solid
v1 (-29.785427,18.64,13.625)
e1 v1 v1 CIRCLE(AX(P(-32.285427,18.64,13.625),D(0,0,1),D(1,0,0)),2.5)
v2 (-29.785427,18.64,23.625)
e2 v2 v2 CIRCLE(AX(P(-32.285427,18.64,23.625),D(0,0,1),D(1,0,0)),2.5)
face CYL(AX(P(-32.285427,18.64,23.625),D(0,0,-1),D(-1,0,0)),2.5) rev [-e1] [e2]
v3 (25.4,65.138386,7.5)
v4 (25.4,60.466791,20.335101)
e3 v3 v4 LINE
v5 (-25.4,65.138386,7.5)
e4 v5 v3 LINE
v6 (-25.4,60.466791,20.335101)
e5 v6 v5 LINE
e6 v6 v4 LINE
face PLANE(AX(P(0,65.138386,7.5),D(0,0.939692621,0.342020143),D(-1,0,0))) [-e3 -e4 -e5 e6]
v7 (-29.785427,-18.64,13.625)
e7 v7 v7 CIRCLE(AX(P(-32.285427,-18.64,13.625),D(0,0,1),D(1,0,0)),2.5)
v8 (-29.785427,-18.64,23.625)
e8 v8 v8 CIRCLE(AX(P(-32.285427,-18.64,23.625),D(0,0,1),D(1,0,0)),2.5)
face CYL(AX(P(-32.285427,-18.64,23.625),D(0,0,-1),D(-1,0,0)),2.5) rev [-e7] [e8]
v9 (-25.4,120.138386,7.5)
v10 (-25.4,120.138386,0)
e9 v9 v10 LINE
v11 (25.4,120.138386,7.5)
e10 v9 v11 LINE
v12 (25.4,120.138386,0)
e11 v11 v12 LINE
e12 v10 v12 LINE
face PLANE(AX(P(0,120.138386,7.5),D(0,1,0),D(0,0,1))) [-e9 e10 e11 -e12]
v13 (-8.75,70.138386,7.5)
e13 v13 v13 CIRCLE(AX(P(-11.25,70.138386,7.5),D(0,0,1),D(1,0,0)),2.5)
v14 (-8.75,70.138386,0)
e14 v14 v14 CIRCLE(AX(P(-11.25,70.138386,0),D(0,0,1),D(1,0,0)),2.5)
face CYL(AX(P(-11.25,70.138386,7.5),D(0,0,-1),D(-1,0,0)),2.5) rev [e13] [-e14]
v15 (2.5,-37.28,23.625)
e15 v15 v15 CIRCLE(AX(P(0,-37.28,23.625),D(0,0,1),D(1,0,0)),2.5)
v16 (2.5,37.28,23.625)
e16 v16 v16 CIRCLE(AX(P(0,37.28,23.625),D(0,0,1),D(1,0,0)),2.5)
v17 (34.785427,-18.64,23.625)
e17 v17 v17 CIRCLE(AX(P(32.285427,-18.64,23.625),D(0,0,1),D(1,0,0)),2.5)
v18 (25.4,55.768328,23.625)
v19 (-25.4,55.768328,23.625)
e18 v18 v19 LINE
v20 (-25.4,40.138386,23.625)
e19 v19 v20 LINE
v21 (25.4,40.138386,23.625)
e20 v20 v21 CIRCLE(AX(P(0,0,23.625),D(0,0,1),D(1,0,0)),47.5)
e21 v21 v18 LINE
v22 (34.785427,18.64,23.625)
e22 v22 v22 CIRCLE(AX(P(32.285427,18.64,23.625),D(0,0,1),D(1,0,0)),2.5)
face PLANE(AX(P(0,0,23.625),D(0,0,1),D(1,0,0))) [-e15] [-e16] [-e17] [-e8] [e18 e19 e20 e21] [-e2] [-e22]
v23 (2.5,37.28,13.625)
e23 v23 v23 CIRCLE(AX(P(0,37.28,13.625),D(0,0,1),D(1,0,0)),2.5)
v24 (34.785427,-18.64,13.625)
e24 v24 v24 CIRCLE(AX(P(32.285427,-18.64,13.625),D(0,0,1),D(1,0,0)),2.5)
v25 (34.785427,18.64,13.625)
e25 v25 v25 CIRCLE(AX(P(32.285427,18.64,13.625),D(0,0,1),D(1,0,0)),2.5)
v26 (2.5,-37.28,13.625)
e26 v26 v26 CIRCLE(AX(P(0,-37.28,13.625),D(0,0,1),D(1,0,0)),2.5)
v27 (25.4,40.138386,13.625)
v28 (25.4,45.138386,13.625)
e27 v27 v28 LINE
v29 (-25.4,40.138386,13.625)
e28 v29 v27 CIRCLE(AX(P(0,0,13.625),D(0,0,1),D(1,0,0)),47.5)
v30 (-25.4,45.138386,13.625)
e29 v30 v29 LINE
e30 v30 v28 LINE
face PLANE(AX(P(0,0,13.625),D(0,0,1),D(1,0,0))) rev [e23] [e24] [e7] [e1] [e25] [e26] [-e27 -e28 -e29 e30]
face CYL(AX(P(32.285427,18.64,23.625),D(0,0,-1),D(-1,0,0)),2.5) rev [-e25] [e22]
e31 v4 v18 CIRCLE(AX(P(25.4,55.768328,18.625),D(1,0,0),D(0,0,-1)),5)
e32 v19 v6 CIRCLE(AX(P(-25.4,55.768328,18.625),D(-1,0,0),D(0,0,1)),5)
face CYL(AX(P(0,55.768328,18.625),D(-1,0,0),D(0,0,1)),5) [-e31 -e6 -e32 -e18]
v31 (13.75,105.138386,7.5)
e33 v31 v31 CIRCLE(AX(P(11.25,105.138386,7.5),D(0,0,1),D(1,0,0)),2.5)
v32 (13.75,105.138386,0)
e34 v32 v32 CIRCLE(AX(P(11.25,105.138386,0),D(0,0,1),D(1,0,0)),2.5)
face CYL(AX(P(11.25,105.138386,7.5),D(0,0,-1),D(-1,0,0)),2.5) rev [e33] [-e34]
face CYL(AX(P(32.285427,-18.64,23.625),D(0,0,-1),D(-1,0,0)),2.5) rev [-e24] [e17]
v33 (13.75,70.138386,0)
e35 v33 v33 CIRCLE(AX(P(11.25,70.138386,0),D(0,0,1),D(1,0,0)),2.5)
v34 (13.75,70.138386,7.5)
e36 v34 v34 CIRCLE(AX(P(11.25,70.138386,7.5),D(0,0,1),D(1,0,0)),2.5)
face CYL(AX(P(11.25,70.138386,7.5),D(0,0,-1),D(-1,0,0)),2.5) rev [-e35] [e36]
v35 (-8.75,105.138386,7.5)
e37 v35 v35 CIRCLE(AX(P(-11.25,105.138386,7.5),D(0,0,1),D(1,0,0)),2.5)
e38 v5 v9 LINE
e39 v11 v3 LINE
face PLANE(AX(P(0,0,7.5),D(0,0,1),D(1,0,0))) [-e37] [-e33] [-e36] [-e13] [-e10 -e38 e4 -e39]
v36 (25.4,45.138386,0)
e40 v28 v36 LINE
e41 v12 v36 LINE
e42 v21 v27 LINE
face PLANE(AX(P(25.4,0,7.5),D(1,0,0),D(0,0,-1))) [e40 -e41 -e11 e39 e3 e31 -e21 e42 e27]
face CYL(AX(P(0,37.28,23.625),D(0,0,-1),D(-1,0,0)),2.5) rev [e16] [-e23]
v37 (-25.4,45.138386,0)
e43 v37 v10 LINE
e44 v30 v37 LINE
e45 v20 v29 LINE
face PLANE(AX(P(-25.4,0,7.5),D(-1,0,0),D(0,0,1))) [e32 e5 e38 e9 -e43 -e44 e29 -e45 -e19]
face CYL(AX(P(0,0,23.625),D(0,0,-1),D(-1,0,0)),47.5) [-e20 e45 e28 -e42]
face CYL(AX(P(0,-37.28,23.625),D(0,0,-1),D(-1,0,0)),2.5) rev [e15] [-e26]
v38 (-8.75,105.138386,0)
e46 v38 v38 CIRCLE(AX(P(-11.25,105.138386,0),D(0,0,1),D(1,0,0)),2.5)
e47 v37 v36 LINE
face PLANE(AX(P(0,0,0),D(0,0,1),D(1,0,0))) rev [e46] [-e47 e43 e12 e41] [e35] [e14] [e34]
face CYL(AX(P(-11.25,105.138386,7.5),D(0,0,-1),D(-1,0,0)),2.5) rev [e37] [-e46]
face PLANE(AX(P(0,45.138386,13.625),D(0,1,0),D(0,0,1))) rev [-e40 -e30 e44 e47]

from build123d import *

# Parameters (mm, degrees)
SKETCH1_W           = 50.8
SKETCH1_H           = 65.000000038
SKETCH1_R           = 2.5
EXTRUDE_5_DEPTH     = 7.5
SKETCH1_3_W         = 50.8
SKETCH1_3_H         = 10
BOSS_EXTRUDE1_DEPTH = 13.625
BOSS_EXTRUDE2_START = 13.625
SKETCH1_4_R         = 2.5
SKETCH1_4_W         = 50.8
SKETCH1_4_H         = 10
BOSS_EXTRUDE2_DEPTH = 10
CHAMFER1_SIZE       = 10
CHAMFER1_SIZE_2     = 27.474774195
FILLET1_R           = 5


with BuildPart() as part:
    # Sketch1 → 5 (new body)
    with BuildSketch(Plane.XY):
        with Locations((0, 87.638385637)):
            Rectangle(SKETCH1_W, SKETCH1_H)
        with Locations((-11.25, 70.138385656)):
            Circle(SKETCH1_R, mode=Mode.SUBTRACT)
        with Locations((-11.25, 105.138385656)):
            Circle(SKETCH1_R, mode=Mode.SUBTRACT)
        with Locations((11.25, 70.138385656)):
            Circle(SKETCH1_R, mode=Mode.SUBTRACT)
        with Locations((11.25, 105.138385656)):
            Circle(SKETCH1_R, mode=Mode.SUBTRACT)
    extrude(amount=EXTRUDE_5_DEPTH)

    # Sketch1<3> → Boss-Extrude1 (add)
    with BuildSketch(Plane.XY):
        with Locations((0, 50.138385618)):
            Rectangle(SKETCH1_3_W, SKETCH1_3_H)
    extrude(amount=BOSS_EXTRUDE1_DEPTH)

    # Sketch1<4> → Boss-Extrude2 (add)
    # profile 1 of 2: a face of its own
    with BuildSketch(Plane.XY.offset(BOSS_EXTRUDE2_START)):
        with BuildLine():
            Line((-25.4, 45.138385618), (-25.4, 40.138385618))
            ThreePointArc((-25.4, 40.138385618), (0, -47.5), (25.4, 40.138385618))
            Line((25.4, 40.138385618), (25.4, 45.138385618))
            Line((25.4, 45.138385618), (-25.4, 45.138385618))
        make_face()
        with Locations((-32.285427053, -18.64)):
            Circle(SKETCH1_4_R, mode=Mode.SUBTRACT)
        with Locations((-32.285427053, 18.64)):
            Circle(SKETCH1_4_R, mode=Mode.SUBTRACT)
        with Locations((0, -37.28)):
            Circle(SKETCH1_4_R, mode=Mode.SUBTRACT)
        with Locations((32.285427053, -18.64)):
            Circle(SKETCH1_4_R, mode=Mode.SUBTRACT)
        with Locations((32.285427053, 18.64)):
            Circle(SKETCH1_4_R, mode=Mode.SUBTRACT)
        with Locations((0, 37.28)):
            Circle(SKETCH1_4_R, mode=Mode.SUBTRACT)
    # profile 2 of 2: a face of its own
    with BuildSketch(Plane.XY.offset(BOSS_EXTRUDE2_START)):
        with Locations((0, 50.138385618)):
            Rectangle(SKETCH1_4_W, SKETCH1_4_H)
    extrude(amount=BOSS_EXTRUDE2_DEPTH)

    # Chamfer1
    # the kernel refuses this chamfer: 27.474774195, 10 mm, written as the material it adds along each edge
    with BuildSketch(Plane(origin=(-25.4, 55.138385618, 7.5), x_dir=(0, 0.9950833631817486, -0.0990409022520505), z_dir=(1, 0, 0))) as chamfer1_piece_1_section:
        Polygon((CHAMFER1_SIZE * 0.995083363182, CHAMFER1_SIZE * 0.0990409022521), (-CHAMFER1_SIZE_2 * 0.0990409022504, CHAMFER1_SIZE_2 * 0.995083363165), (0, 0), align=None)
    chamfer1_piece_1 = extrude(amount=50.8, mode=Mode.PRIVATE)
    chamfer1_piece_1 = split(chamfer1_piece_1, bisect_by=Plane(origin=(0, 58.7545268, 23.625), z_dir=(0, 0, -1)), keep=Keep.TOP, mode=Mode.PRIVATE)
    add(chamfer1_piece_1)

    # Fillet1
    fillet1_edges = [part.edges().sort_by_distance(p)[0] for p in [
        (0, 59.26936559, 23.625),
    ]]
    fillet(fillet1_edges, radius=FILLET1_R)


solid = part.part
